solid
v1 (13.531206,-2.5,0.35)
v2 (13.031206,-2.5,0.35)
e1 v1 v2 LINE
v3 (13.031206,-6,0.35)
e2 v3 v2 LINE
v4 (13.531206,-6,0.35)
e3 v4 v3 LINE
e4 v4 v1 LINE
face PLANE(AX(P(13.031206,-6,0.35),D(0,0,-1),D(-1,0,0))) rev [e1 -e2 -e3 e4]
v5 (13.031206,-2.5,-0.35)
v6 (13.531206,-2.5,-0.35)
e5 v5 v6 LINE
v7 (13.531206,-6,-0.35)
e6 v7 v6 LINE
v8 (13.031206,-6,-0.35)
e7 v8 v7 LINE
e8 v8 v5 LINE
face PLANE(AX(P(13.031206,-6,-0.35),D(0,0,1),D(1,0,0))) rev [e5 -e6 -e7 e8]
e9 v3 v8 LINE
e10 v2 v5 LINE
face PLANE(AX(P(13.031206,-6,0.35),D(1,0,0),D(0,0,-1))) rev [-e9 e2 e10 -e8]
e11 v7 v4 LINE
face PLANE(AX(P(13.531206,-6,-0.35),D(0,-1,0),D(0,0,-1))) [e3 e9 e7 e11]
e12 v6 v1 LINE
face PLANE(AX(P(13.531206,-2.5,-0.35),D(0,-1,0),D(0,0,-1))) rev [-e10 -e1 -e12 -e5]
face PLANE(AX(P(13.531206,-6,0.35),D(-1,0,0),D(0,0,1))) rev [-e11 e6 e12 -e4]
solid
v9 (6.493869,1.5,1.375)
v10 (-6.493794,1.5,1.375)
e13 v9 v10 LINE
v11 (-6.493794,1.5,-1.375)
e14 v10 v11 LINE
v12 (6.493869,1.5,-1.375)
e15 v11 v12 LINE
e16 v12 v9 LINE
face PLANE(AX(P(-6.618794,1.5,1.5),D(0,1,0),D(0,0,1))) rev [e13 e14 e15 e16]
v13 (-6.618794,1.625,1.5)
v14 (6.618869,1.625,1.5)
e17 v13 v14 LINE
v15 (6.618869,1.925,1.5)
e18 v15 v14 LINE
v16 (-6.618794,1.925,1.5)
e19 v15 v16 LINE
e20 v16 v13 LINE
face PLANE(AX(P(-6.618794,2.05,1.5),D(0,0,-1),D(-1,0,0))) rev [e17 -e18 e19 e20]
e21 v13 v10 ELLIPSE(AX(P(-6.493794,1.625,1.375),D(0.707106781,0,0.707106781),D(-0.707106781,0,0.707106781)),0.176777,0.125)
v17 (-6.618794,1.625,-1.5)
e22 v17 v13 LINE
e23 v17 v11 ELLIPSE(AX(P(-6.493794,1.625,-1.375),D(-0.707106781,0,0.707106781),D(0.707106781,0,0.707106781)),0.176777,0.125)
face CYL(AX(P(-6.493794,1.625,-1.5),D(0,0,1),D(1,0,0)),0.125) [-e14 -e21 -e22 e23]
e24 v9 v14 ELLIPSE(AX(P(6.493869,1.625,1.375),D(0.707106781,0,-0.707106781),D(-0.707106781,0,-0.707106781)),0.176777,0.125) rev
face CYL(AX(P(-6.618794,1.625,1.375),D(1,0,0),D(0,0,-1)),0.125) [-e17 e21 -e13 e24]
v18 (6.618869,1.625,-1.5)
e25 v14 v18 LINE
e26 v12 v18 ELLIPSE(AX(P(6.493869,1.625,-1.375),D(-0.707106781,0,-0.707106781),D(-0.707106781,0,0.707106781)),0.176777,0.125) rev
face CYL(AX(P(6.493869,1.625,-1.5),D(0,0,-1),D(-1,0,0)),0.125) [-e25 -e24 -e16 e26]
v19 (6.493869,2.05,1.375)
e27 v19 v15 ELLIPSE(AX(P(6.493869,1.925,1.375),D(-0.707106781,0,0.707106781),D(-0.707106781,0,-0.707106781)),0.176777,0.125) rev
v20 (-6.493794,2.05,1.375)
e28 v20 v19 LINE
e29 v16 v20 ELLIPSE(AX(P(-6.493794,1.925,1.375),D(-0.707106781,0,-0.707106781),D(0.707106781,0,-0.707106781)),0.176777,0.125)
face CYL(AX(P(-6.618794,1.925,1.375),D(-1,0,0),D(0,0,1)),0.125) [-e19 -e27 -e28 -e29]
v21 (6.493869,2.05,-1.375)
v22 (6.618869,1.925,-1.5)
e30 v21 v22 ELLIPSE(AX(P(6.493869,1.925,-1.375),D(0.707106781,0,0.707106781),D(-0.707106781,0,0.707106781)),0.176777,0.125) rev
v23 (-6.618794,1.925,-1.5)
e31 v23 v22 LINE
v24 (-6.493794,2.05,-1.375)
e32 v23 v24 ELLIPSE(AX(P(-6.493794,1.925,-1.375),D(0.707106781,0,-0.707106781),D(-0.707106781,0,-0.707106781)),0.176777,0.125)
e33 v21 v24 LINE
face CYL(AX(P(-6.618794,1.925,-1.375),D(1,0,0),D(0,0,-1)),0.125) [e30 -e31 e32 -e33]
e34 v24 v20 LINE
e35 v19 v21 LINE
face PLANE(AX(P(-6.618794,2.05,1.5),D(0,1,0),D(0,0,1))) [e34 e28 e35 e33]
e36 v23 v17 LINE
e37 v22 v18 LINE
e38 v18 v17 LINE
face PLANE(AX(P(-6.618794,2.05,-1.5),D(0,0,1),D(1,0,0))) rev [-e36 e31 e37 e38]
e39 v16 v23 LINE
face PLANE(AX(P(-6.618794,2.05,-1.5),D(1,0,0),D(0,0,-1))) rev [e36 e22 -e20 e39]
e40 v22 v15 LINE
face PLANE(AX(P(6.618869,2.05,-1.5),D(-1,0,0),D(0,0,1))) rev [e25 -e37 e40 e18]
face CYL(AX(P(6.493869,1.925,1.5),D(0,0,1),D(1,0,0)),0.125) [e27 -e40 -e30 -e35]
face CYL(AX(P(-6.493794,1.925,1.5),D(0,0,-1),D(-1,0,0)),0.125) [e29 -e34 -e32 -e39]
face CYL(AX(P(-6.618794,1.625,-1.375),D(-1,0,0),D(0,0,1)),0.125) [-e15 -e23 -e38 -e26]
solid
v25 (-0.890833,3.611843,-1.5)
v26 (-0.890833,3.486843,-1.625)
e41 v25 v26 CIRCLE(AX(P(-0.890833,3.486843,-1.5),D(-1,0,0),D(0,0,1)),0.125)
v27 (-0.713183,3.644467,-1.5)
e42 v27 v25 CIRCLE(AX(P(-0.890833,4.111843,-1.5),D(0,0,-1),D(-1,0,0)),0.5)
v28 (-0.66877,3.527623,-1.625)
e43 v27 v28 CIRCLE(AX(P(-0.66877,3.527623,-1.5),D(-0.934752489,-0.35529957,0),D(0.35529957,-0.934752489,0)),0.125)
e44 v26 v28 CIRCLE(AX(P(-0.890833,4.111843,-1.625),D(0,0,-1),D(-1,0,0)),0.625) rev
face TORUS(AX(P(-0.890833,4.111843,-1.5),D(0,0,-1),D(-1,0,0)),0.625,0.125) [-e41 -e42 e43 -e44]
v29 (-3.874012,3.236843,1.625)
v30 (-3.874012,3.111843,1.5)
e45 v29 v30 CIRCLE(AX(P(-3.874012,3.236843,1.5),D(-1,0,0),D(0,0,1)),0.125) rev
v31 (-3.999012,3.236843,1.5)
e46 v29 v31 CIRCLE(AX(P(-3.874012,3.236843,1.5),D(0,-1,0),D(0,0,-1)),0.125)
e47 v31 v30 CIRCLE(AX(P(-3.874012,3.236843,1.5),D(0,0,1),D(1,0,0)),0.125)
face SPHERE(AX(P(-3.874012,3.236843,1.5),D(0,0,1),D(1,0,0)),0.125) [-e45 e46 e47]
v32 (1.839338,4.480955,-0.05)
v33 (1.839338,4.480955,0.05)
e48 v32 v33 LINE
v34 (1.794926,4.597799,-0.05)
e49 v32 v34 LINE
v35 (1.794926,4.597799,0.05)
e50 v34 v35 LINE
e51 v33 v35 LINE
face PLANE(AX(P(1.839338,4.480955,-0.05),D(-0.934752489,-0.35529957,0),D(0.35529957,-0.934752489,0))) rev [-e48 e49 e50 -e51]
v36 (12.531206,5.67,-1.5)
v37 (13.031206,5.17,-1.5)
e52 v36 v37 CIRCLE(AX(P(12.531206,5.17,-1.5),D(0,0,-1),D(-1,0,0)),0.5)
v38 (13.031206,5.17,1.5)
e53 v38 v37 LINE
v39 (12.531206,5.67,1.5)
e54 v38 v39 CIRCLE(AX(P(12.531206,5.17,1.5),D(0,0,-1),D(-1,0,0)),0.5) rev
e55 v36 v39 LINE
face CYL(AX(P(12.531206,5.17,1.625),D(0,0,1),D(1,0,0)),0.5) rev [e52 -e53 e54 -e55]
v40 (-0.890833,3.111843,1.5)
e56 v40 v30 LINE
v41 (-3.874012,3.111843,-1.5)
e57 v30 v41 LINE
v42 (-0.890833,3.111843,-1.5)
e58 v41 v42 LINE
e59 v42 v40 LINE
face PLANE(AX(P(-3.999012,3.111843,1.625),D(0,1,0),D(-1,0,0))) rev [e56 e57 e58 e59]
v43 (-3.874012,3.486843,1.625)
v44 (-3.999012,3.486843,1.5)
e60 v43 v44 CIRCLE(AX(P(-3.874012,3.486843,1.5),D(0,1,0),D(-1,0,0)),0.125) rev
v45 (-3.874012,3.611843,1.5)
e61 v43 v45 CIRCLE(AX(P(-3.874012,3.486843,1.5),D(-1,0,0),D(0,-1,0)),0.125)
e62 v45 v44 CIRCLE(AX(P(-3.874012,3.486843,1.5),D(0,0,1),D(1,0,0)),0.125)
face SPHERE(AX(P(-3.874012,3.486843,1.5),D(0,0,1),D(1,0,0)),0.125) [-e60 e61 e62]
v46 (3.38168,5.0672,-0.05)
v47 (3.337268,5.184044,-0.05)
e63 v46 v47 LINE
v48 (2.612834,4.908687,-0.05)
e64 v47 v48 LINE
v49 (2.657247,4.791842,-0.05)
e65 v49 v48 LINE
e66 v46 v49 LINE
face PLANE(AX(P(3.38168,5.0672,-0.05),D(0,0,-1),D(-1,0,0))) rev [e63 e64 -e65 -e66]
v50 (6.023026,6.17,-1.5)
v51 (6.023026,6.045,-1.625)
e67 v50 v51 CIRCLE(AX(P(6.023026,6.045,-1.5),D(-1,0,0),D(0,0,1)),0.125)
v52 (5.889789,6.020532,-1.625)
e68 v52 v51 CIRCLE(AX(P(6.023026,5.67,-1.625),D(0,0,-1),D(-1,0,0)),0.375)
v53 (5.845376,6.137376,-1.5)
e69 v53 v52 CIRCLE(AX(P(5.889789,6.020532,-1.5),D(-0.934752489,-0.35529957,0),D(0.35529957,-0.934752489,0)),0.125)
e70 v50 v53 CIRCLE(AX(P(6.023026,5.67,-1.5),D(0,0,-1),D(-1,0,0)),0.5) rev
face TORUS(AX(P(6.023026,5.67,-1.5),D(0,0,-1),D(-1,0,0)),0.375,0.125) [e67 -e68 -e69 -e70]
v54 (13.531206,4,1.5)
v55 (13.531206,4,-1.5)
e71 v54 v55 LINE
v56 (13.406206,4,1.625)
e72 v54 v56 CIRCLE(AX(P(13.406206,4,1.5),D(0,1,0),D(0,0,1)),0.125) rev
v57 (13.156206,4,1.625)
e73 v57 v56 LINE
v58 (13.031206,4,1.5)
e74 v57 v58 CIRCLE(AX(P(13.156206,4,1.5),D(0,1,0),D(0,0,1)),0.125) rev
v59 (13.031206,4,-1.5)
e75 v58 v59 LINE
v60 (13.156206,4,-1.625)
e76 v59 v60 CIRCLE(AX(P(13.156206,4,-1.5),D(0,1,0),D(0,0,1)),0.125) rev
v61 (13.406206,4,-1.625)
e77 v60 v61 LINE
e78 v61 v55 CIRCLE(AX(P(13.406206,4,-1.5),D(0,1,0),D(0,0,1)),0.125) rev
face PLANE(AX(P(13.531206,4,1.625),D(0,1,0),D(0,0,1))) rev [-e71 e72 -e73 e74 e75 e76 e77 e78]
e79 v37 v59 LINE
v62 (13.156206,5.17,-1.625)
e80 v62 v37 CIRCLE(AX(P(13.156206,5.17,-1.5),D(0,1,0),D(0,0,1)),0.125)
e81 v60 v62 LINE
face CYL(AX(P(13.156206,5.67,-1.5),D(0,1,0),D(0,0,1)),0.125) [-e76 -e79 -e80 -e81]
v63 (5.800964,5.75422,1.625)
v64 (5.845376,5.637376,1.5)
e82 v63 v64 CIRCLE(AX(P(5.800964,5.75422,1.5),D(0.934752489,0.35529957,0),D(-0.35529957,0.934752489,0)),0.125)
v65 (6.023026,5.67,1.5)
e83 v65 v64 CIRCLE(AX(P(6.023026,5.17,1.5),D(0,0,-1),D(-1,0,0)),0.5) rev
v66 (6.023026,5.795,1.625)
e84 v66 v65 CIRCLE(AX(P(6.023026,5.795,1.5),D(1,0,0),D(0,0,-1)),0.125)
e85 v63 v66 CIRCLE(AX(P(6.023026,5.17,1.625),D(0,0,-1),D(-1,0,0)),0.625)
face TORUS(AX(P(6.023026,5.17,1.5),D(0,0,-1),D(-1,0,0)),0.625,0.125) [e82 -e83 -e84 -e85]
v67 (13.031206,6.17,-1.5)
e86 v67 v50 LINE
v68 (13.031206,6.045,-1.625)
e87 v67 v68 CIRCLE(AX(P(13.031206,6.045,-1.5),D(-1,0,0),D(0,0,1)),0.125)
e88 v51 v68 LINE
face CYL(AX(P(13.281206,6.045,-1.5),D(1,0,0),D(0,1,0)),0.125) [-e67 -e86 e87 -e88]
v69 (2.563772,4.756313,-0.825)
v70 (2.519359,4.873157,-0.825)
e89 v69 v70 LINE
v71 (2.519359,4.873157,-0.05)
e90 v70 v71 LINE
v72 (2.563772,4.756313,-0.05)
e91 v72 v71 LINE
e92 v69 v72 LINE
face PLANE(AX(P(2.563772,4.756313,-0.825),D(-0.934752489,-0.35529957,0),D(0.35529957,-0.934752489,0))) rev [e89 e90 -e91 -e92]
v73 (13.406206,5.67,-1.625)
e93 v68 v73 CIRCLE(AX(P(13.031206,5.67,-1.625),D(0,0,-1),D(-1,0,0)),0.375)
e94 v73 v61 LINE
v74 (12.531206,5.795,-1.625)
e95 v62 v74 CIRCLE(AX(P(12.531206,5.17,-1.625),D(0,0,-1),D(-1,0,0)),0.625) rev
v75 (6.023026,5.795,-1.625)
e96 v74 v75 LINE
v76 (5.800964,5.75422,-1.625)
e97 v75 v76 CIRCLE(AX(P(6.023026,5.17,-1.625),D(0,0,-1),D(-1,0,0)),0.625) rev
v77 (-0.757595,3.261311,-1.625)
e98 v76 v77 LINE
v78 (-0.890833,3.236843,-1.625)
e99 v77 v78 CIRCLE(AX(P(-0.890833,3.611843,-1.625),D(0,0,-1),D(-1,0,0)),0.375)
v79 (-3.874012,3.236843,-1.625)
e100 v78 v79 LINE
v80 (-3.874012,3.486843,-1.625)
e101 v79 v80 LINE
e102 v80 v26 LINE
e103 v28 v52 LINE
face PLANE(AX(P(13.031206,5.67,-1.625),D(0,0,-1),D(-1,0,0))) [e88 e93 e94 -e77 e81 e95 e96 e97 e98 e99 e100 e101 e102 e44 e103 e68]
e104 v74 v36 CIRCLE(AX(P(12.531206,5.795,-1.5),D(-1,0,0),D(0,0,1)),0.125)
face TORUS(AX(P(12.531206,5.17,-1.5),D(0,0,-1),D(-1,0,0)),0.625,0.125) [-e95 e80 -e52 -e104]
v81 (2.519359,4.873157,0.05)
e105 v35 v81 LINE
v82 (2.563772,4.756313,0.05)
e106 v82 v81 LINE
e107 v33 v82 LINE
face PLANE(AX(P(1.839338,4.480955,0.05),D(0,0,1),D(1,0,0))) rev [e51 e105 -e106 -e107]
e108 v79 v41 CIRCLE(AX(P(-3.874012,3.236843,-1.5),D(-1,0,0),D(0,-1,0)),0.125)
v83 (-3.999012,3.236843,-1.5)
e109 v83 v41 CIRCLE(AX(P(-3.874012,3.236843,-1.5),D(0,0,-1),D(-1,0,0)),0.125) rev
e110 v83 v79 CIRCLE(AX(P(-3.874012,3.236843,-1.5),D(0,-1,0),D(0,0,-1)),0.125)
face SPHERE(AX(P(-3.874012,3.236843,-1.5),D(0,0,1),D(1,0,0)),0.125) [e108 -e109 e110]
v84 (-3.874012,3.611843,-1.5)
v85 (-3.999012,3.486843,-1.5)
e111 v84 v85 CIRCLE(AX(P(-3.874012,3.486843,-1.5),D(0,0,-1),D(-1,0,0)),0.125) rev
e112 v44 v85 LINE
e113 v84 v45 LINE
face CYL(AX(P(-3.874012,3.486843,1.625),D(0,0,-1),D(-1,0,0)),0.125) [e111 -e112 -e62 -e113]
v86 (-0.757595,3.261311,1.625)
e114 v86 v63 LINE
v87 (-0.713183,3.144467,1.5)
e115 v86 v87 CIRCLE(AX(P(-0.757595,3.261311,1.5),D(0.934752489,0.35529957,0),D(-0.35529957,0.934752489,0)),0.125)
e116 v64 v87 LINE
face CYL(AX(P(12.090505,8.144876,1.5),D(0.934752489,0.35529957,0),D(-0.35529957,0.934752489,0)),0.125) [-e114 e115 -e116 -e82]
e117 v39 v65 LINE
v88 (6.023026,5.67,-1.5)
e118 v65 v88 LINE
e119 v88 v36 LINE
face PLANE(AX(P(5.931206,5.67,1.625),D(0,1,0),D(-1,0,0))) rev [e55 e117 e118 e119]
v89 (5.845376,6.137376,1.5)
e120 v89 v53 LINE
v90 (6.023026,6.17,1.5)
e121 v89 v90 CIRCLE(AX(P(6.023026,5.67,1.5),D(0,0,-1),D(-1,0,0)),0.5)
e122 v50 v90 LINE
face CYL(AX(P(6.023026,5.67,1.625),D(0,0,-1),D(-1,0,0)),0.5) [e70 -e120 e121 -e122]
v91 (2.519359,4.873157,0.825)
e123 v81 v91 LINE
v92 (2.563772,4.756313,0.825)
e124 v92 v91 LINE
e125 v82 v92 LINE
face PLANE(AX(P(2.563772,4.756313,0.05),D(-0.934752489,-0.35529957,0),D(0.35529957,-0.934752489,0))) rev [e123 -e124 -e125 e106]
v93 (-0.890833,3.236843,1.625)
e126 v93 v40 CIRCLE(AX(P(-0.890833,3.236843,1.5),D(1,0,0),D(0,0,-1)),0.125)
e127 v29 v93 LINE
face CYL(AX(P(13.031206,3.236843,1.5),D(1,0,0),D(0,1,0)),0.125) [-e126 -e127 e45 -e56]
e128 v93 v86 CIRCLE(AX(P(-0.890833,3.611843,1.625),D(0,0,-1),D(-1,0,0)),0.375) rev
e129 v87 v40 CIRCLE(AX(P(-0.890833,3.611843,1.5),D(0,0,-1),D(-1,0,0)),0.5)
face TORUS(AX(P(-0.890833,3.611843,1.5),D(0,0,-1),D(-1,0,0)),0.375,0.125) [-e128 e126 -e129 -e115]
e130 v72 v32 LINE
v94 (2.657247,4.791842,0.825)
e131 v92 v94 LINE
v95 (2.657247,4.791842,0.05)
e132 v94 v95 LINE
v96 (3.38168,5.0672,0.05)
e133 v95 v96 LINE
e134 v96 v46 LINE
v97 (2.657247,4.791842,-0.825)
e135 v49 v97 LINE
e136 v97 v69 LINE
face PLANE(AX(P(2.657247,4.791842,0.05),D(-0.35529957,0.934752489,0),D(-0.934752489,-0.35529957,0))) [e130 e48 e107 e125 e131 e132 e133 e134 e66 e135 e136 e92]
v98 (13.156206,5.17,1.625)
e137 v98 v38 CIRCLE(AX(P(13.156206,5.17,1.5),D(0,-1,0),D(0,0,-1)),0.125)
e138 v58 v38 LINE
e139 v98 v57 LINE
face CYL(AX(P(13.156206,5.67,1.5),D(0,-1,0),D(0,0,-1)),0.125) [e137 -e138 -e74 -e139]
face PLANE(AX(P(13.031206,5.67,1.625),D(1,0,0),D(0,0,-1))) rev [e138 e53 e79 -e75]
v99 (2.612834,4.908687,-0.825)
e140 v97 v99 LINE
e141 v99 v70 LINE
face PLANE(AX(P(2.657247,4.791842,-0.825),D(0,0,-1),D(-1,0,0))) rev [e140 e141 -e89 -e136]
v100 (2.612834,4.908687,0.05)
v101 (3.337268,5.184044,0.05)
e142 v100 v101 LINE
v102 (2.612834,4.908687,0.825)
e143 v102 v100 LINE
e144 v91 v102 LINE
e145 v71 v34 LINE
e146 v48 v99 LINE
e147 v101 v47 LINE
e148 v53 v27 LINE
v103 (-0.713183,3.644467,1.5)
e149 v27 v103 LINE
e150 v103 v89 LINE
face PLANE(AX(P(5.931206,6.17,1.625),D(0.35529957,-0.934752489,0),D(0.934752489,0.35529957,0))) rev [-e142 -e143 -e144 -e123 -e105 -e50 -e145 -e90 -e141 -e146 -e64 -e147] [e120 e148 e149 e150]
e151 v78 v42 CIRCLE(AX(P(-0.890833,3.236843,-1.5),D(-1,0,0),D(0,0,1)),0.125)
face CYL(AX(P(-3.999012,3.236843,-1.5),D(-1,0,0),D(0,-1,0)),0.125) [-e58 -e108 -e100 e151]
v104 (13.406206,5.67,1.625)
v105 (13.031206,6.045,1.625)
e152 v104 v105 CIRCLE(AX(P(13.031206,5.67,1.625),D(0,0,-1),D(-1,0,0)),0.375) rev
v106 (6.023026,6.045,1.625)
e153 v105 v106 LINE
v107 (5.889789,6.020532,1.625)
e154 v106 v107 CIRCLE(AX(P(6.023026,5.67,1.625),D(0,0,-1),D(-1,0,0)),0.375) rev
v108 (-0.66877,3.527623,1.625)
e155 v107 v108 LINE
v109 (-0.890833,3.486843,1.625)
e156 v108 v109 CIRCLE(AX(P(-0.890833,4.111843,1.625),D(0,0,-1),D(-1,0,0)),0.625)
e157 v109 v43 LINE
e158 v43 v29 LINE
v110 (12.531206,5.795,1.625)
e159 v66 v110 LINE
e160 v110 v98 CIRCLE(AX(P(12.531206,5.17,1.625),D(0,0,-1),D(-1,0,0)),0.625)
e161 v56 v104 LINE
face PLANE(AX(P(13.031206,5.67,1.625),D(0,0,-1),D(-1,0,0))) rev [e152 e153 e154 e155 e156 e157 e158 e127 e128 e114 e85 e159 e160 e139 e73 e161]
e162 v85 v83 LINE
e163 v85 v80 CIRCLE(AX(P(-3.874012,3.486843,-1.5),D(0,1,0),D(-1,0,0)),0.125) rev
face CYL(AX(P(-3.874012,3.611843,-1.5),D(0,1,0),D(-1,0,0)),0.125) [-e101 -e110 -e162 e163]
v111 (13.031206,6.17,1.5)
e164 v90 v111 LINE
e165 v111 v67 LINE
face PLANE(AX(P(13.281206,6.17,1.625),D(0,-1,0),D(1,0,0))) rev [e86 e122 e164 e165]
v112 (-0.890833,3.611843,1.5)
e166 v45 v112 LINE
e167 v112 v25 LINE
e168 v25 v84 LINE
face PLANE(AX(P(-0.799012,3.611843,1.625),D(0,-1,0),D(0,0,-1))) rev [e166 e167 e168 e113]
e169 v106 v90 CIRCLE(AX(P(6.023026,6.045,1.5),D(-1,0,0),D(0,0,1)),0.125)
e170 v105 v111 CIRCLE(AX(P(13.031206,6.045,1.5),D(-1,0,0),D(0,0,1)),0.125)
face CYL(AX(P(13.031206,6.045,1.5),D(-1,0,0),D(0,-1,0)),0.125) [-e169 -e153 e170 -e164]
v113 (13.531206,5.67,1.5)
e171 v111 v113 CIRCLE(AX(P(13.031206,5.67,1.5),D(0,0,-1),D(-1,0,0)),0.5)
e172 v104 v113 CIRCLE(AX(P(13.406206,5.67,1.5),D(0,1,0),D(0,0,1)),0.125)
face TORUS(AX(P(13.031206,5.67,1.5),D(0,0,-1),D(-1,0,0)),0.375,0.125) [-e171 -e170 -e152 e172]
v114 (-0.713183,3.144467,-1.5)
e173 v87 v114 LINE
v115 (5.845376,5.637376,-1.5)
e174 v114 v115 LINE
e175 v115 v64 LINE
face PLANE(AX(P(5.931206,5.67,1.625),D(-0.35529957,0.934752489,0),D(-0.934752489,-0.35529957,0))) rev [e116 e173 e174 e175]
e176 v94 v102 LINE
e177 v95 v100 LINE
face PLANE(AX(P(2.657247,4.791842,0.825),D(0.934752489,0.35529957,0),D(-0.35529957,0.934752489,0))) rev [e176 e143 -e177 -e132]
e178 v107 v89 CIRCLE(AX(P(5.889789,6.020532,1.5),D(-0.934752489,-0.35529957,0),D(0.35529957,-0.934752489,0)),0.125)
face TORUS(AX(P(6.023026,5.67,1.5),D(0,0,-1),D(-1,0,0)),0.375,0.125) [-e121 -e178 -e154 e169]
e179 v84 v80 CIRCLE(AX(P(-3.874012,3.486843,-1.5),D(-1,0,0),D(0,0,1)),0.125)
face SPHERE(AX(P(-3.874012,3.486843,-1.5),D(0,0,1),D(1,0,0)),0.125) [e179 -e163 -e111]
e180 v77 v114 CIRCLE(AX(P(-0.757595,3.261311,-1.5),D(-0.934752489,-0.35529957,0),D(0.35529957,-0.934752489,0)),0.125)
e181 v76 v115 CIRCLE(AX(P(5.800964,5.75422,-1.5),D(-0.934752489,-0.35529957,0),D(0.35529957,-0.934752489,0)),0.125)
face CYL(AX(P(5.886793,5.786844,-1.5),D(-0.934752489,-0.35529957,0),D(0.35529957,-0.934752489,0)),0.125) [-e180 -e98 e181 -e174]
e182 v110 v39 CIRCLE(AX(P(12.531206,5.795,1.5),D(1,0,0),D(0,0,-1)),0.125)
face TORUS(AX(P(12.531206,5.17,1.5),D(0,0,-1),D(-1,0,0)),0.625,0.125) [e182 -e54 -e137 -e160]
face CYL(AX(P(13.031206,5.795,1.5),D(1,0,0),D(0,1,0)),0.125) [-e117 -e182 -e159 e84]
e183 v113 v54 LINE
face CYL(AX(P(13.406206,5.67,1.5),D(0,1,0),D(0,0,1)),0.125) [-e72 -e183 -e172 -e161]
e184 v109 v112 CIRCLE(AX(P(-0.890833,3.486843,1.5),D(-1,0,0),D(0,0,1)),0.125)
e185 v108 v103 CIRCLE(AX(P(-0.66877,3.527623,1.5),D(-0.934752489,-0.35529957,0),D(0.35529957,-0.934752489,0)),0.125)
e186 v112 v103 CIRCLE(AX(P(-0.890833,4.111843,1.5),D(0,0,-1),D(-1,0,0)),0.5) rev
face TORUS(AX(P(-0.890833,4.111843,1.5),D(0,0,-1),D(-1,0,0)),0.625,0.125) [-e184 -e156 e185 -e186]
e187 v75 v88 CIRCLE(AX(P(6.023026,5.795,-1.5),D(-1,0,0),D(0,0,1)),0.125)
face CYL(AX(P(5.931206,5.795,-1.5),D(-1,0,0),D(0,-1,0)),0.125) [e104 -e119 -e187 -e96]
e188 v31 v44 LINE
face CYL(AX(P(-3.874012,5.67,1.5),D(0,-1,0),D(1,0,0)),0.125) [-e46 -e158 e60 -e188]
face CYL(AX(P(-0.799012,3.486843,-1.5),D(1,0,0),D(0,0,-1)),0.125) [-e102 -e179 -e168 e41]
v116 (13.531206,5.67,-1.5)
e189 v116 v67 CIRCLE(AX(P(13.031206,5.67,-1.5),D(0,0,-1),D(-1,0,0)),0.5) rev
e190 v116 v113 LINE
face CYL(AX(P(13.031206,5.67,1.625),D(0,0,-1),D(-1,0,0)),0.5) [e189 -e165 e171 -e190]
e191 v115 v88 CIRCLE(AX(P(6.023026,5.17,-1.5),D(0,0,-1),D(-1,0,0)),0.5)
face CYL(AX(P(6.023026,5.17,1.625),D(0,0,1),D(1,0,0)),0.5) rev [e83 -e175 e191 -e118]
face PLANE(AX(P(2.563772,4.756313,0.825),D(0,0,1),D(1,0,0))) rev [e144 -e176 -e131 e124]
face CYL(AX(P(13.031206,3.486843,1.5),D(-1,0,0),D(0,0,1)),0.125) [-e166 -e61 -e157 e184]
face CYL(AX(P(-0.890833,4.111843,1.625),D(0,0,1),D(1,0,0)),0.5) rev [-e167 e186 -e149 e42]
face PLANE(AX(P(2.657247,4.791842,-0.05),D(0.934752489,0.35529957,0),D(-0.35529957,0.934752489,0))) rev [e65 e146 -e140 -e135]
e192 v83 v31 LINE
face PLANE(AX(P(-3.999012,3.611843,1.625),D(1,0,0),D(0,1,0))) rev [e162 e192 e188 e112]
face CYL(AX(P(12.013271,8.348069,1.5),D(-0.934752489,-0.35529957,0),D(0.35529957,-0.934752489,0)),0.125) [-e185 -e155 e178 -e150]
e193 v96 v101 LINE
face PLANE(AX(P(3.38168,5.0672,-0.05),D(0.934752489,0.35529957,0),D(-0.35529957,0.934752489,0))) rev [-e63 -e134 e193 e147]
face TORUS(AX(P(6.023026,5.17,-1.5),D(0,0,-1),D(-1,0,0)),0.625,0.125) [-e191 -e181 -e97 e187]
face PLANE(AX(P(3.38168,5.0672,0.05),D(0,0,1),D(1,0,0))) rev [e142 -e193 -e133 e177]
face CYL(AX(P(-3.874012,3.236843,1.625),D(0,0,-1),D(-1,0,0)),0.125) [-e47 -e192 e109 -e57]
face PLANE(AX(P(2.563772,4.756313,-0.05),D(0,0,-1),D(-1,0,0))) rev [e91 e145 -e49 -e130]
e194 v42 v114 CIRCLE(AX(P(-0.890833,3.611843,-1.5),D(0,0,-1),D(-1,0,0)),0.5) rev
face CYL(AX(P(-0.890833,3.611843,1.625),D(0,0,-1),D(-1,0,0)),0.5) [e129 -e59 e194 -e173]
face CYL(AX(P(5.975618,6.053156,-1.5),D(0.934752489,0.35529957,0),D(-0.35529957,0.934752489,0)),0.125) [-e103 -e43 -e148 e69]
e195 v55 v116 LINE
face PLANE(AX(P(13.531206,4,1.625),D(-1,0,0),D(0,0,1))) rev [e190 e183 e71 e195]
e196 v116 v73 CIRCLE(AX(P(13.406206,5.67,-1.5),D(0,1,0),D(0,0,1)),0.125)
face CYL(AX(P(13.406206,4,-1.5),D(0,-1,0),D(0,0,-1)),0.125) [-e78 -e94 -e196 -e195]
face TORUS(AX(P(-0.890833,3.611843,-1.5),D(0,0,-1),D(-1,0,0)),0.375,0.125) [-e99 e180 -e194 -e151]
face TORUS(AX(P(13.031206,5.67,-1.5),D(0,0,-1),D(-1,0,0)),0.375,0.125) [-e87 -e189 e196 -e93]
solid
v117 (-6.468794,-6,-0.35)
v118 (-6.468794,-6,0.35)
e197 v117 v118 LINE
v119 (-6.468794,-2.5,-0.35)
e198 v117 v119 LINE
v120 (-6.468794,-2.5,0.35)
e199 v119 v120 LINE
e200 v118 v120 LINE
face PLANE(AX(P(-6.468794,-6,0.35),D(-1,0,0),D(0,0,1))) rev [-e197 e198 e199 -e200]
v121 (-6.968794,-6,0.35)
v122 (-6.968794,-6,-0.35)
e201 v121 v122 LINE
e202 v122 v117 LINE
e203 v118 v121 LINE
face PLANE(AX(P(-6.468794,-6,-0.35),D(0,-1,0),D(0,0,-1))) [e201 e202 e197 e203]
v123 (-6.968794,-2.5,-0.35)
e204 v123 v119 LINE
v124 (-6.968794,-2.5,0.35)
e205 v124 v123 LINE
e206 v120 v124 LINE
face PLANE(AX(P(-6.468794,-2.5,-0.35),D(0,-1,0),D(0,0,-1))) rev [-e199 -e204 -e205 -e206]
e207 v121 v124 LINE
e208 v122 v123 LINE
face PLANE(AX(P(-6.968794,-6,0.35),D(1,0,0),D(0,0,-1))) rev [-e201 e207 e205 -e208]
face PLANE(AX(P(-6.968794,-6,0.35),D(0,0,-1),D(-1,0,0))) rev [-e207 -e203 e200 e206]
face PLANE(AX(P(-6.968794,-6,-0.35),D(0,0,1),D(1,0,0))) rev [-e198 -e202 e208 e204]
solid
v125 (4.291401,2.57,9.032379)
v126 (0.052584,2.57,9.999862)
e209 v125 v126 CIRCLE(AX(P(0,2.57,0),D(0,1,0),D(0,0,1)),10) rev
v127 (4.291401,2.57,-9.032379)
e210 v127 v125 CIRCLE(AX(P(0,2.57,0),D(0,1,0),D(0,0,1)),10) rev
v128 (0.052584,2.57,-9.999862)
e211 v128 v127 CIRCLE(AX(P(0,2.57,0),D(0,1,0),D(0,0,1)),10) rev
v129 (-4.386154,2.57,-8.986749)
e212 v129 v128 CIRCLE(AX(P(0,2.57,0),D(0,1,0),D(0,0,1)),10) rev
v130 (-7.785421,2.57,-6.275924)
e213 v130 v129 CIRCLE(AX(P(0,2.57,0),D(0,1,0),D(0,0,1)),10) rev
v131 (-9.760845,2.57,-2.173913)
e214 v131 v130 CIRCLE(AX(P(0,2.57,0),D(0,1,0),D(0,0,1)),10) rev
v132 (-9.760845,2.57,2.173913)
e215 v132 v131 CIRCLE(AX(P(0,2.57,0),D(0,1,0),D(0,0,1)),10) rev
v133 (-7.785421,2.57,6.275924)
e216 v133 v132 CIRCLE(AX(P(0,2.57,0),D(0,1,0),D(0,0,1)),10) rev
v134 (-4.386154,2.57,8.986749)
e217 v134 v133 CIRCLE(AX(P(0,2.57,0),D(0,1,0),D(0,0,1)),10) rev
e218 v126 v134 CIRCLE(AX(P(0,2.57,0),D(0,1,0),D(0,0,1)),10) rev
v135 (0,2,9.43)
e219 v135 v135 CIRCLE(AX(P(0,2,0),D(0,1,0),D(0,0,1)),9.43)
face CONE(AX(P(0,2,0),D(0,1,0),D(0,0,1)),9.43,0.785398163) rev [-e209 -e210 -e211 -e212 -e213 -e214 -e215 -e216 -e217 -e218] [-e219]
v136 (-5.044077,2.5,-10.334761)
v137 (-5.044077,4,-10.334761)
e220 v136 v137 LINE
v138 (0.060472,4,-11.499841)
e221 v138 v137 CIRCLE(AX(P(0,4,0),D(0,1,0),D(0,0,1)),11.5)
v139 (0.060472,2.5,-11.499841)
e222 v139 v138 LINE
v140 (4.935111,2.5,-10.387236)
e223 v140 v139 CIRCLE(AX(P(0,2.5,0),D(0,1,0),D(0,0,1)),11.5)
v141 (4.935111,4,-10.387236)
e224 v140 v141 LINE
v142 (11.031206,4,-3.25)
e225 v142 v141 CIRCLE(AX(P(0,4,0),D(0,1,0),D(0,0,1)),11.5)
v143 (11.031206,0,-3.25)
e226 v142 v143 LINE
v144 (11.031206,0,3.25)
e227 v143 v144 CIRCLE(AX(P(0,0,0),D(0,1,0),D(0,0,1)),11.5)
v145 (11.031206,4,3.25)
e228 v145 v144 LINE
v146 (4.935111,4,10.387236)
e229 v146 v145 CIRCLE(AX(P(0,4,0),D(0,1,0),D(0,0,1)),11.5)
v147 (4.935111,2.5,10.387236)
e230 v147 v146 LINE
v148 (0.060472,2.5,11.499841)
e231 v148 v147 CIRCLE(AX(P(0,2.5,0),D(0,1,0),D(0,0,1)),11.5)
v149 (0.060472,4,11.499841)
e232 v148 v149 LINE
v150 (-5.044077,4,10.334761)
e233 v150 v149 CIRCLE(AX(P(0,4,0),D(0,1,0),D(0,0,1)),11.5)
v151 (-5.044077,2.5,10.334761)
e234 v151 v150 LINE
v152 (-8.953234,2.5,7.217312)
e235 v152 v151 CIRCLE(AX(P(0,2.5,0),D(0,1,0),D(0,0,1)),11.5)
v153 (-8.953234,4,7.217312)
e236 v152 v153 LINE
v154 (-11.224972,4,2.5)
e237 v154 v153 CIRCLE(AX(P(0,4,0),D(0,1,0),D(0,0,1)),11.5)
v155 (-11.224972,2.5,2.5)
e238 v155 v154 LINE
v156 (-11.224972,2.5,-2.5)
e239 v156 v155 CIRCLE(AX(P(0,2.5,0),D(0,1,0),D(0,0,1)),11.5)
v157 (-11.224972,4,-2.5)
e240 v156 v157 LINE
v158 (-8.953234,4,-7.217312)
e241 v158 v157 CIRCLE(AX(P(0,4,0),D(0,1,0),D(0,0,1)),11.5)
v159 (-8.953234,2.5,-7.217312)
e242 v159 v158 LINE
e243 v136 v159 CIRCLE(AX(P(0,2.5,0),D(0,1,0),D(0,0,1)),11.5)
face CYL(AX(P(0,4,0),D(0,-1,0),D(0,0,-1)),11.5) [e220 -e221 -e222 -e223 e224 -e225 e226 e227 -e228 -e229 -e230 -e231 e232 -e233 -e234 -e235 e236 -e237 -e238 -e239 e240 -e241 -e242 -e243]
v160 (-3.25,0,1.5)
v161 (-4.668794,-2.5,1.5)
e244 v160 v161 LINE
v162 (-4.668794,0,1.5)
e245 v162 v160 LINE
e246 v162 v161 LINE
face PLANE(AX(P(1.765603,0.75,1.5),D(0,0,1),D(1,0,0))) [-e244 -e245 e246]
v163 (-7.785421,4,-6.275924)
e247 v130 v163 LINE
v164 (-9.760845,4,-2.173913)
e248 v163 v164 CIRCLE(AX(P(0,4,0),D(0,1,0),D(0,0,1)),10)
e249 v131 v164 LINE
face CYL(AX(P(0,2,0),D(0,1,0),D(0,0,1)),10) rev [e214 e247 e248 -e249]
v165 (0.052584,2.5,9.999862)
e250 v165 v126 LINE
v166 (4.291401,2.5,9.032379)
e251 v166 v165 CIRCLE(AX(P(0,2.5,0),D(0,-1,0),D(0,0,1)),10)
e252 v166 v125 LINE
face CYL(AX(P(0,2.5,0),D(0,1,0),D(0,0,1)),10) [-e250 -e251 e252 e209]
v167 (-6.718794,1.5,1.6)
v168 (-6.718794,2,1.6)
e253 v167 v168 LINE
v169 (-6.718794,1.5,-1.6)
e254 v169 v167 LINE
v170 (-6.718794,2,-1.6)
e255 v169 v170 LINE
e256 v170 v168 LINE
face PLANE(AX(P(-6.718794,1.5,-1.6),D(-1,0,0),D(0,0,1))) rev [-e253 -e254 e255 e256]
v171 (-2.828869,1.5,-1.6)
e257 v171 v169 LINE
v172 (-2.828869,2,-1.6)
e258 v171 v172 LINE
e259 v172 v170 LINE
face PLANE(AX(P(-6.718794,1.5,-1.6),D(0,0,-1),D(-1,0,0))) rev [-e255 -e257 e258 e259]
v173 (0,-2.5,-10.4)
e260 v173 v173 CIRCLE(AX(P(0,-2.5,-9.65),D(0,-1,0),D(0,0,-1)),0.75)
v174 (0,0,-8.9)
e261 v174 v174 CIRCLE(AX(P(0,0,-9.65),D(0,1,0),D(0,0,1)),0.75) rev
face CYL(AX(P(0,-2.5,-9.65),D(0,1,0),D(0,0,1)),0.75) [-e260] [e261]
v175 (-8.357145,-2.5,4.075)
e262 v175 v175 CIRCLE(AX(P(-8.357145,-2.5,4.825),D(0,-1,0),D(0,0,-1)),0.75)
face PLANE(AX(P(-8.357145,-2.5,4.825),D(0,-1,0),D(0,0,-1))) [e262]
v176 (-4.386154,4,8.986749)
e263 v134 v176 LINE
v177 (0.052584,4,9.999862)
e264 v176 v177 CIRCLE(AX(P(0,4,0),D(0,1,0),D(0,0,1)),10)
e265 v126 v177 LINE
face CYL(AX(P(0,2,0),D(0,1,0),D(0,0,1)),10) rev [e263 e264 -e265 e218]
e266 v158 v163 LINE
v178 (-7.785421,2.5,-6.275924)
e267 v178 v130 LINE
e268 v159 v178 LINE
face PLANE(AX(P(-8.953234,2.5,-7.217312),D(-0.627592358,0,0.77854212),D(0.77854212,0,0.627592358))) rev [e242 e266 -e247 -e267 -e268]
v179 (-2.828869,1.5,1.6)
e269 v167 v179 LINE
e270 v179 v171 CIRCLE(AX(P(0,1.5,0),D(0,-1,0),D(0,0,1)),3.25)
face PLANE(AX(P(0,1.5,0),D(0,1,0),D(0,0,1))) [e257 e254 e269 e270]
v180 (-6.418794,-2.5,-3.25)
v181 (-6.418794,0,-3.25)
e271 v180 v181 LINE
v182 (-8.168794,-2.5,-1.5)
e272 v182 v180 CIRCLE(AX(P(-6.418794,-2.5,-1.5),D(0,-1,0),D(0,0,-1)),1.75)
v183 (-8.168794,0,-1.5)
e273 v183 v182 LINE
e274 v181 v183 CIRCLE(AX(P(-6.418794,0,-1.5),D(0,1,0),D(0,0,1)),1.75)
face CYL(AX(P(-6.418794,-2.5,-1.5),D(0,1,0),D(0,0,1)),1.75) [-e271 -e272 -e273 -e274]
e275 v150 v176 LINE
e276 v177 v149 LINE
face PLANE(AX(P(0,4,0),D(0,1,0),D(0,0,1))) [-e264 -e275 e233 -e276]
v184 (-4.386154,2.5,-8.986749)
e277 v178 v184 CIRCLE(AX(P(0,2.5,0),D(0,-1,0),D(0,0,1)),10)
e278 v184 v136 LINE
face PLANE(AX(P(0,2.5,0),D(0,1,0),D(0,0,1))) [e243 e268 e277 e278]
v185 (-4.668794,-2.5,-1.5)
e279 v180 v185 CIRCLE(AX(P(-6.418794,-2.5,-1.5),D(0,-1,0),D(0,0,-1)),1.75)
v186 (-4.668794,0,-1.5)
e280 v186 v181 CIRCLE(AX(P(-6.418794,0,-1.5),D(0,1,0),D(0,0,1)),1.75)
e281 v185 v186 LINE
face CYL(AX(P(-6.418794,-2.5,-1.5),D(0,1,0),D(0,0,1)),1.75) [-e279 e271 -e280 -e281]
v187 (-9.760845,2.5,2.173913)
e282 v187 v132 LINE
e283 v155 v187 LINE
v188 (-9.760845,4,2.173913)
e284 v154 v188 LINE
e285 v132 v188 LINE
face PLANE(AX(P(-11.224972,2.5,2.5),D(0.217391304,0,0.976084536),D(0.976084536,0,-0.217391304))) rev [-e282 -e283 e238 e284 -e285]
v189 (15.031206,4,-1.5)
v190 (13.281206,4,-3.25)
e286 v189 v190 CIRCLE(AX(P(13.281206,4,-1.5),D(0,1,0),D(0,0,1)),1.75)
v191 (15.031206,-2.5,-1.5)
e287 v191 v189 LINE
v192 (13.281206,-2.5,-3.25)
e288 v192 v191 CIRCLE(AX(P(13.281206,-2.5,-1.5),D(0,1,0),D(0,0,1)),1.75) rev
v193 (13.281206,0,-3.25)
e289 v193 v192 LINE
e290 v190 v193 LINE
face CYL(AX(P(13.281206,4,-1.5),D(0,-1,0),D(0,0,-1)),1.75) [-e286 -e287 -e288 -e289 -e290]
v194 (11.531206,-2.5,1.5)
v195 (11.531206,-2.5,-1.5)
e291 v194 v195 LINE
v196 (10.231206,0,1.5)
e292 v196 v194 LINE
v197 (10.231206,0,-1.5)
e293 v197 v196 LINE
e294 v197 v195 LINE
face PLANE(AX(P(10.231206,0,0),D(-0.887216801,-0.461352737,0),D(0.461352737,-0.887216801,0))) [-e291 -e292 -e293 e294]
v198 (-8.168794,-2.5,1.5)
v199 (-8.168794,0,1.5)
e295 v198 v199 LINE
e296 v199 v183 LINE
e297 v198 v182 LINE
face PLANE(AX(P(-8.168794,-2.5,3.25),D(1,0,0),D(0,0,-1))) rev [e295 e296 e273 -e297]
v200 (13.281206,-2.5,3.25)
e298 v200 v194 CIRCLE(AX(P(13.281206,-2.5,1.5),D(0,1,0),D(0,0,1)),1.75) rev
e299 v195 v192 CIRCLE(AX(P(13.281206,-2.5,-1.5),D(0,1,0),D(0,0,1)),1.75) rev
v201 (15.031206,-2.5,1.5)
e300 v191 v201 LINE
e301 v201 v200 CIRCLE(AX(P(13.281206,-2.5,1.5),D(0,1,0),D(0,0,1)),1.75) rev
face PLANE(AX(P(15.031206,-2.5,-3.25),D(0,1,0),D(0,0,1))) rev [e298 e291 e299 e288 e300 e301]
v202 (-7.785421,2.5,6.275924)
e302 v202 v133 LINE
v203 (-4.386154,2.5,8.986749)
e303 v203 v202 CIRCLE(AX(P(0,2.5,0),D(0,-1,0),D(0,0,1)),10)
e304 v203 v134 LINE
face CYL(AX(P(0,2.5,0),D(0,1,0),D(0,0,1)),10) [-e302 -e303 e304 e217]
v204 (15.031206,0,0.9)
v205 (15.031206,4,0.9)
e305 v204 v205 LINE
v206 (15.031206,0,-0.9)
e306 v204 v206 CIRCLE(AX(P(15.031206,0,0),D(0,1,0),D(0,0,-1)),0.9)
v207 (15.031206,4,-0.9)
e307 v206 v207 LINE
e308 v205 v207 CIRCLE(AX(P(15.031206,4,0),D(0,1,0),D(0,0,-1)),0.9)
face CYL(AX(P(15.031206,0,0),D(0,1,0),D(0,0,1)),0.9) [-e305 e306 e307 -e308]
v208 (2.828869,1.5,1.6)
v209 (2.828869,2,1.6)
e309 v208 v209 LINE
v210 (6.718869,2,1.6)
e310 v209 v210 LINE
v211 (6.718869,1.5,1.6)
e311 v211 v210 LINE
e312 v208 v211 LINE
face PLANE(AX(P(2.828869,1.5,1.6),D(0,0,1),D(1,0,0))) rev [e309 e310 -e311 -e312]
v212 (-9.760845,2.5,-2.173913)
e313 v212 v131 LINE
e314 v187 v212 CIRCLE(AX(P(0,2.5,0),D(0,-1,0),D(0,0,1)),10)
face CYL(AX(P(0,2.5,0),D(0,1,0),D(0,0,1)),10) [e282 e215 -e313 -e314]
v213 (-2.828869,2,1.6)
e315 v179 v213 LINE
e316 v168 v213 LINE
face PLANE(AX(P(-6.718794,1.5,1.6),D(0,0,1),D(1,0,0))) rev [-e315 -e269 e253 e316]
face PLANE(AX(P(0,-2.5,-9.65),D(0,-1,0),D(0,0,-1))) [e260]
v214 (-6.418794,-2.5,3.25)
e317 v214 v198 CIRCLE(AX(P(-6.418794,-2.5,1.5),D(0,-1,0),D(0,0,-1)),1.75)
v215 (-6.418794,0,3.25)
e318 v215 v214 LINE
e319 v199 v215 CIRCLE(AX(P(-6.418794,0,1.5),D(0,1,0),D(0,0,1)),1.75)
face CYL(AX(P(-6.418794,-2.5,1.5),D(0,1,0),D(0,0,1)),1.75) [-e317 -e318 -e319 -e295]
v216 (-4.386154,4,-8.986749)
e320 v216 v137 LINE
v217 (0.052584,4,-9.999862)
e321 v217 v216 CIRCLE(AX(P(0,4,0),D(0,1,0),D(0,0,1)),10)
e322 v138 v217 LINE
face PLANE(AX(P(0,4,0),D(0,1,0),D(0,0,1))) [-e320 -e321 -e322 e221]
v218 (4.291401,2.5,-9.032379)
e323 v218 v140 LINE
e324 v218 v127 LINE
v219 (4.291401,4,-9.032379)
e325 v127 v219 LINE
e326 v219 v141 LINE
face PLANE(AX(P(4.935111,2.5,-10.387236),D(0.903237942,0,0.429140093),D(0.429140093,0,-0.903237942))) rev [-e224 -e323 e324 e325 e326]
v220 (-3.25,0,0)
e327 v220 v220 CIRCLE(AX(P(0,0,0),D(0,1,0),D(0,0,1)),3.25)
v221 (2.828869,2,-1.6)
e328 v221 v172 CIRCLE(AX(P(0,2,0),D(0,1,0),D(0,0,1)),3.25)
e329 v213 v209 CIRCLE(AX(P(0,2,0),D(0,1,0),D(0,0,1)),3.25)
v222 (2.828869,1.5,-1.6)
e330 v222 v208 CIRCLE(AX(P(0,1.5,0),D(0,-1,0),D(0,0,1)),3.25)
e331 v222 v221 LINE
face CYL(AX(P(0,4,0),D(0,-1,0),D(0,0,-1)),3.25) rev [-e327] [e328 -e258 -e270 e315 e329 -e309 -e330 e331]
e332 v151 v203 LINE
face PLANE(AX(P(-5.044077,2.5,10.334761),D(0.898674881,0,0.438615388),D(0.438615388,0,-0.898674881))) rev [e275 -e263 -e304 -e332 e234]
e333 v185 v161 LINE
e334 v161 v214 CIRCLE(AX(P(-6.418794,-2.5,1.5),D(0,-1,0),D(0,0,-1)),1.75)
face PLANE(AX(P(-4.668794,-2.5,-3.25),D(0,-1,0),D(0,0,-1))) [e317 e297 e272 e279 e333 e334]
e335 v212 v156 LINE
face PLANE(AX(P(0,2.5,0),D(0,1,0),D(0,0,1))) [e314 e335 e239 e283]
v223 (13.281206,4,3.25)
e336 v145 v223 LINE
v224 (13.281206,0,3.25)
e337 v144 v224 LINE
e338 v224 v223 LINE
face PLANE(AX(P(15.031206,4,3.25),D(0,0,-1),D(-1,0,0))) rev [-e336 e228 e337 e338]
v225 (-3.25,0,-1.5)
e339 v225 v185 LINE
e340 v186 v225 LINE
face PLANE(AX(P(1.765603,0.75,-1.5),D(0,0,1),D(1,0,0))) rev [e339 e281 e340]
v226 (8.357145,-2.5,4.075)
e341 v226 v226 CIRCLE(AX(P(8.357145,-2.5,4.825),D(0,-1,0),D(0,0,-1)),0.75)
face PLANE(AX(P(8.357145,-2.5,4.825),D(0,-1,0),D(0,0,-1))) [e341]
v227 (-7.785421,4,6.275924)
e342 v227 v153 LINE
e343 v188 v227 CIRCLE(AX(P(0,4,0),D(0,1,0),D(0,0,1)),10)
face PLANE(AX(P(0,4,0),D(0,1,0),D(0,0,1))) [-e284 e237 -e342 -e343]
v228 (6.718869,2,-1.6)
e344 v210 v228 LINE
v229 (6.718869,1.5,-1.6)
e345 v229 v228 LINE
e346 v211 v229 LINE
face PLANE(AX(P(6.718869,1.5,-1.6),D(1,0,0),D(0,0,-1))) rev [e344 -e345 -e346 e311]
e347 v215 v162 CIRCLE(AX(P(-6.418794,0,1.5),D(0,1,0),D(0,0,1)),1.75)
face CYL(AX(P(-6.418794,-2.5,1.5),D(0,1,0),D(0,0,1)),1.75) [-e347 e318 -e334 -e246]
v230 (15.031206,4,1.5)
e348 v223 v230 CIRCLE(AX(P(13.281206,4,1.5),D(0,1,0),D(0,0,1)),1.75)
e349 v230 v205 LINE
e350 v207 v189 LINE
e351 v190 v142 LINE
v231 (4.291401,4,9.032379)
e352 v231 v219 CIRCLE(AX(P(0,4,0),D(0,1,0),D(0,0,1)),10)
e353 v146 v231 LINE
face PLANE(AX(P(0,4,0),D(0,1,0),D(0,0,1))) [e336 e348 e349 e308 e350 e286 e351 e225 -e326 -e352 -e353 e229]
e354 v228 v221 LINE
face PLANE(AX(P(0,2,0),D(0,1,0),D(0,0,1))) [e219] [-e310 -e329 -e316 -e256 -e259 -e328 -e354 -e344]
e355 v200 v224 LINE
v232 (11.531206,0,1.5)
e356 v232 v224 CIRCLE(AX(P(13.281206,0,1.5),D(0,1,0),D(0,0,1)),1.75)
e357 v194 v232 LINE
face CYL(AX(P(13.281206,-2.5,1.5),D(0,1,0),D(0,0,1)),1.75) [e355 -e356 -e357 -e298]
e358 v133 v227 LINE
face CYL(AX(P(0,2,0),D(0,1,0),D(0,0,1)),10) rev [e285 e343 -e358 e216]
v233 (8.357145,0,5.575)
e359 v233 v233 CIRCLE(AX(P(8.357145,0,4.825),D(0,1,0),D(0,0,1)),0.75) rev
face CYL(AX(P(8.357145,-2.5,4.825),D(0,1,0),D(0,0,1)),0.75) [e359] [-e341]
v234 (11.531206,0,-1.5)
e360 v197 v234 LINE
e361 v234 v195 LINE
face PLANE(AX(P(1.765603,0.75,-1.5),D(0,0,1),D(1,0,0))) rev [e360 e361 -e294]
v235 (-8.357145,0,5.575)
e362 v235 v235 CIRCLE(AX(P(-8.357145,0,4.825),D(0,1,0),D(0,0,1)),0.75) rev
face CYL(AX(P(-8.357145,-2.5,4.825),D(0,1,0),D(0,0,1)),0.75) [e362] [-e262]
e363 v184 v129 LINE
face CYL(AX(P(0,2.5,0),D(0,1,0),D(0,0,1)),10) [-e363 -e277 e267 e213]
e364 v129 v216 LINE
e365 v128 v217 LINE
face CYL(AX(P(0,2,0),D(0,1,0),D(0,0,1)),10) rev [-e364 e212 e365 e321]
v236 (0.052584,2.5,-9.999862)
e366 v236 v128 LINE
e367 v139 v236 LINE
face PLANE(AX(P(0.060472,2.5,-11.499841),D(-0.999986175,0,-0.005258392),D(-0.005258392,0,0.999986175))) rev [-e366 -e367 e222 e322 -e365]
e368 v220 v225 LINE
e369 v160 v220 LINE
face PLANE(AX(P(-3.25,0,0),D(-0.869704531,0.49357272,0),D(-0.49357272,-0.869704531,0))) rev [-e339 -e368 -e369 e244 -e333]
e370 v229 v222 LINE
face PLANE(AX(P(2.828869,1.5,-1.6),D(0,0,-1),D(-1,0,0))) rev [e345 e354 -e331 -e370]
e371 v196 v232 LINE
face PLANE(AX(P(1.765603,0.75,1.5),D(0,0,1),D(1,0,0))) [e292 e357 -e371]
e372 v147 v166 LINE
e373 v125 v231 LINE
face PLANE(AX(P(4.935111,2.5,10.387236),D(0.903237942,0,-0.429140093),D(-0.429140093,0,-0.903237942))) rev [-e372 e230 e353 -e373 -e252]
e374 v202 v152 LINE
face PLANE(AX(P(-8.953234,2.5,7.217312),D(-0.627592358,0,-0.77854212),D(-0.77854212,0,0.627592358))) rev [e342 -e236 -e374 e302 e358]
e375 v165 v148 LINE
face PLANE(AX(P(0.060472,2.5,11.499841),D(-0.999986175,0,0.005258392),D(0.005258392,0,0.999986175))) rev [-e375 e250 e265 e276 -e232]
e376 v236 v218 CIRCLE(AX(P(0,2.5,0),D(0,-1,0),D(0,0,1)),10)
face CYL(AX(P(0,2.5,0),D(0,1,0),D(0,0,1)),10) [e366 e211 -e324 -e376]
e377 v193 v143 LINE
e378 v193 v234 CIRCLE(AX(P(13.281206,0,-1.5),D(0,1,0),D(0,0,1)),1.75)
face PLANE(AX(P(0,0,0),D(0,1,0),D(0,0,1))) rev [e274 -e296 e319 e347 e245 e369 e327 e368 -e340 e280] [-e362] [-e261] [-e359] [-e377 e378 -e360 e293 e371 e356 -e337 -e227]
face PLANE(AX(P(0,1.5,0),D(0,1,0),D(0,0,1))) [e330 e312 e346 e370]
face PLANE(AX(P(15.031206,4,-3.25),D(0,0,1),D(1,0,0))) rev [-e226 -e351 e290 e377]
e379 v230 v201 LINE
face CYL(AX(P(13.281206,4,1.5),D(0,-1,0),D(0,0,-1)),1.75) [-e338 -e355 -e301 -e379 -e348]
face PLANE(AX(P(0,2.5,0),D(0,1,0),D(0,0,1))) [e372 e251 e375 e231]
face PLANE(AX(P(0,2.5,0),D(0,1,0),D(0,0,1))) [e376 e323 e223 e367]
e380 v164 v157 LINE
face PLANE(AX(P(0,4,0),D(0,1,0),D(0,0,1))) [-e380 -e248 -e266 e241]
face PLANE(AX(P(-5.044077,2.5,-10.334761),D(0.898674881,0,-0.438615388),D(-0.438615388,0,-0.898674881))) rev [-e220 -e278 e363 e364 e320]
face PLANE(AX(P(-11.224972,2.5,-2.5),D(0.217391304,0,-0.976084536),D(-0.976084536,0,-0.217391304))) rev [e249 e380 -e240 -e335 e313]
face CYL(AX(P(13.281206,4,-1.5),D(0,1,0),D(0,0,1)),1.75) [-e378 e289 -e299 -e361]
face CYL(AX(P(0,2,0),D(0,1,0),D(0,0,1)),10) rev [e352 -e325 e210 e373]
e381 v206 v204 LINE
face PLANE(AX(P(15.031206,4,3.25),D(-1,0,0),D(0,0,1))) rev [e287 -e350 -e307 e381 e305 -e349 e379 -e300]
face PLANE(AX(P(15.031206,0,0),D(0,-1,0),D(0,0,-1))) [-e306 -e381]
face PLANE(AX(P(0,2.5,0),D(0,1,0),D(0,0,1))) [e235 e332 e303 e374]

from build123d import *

# Parameters (mm, degrees)
SKETCH3_R             = 3.25
BOSS_EXTRUDE2_DEPTH   = 4
SKETCH7_R             = 10
CUT_EXTRUDE1_DEPTH    = 2
CHAMFER3_SIZE         = 0.57
CUT_EXTRUDE2_DEPTH    = 1.5
SKETCH9_R             = 0.75
SKETCH9_W             = 3.5
SKETCH9_H             = 6.5
BOSS_EXTRUDE6_DEPTH   = 2.5
FILLET1_R             = 1.75
RIB1_REACH            = 21.344
SKETCH10_WALL_W       = 43.505635646
SKETCH10_WALL_H       = 3
RIB2_REACH            = 21.344
SKETCH12_WALL_W       = 43.562374554
SKETCH12_WALL_H       = 3
SKETCH13_W            = 0.5
SKETCH13_H            = 0.7
BOSS_EXTRUDE7_DEPTH   = 3.5
BOSS_EXTRUDE7_2_DEPTH = 3.5
CUT_EXTRUDE3_START    = -0.5
CUT_EXTRUDE3_DEPTH    = 0.5
SKETCH15_W            = 13.237663296
SKETCH15_H            = 3
BOSS_EXTRUDE8_DEPTH   = 0.55
BOSS_EXTRUDE9_DEPTH   = 1.625
FILLET2_R             = 0.5
FILLET3_R             = 0.125
FILLET4_R             = 0.125
CUT_EXTRUDE4_DEPTH    = 0.125
BOSS_EXTRUDE10_DEPTH  = 4


with BuildPart() as part:
    # Sketch3 → Boss-Extrude2 (new body)
    with BuildSketch(Plane(origin=(0, 0, 0), x_dir=(1, 0, 0), z_dir=(0, 1, 0))):
        with BuildLine():
            Line((15.031205736, -3.25), (11.031205736, -3.25))
            ThreePointArc((11.031205736, -3.25), (-11.5, 0), (11.031205736, 3.25))
            Line((11.031205736, 3.25), (15.031205736, 3.25))
            Line((15.031205736, 3.25), (15.031205736, -3.25))
        make_face()
        with Locations(Location((0, 0, 0), (0, 0, 270))):
            Circle(SKETCH3_R, mode=Mode.SUBTRACT)
    extrude(amount=BOSS_EXTRUDE2_DEPTH)

    # Sketch7 → Cut-Extrude1 (cut)
    with BuildSketch(Plane(origin=(0, 4, 0), x_dir=(1, 0, 0), z_dir=(0, 1, 0))):
        with Locations(Location((0, 0, 0), (0, 0, 270))):
            Circle(SKETCH7_R)
    extrude(amount=-CUT_EXTRUDE1_DEPTH, mode=Mode.SUBTRACT)

    # Chamfer3
    chamfer3_edges = [part.edges().sort_by_distance(p)[0] for p in [
        (0, 2, -10),
    ]]
    chamfer(chamfer3_edges, length=CHAMFER3_SIZE)

    # Sketch8 → Cut-Extrude2 (cut)
    with BuildSketch(Plane(origin=(0, 4, 0), x_dir=(1, 0, 0), z_dir=(0, 1, 0))):
        with BuildLine():
            Line((-11.22497216, 2.5), (-9.760845357, 2.173913043))
            ThreePointArc((-9.760845357, 2.173913043), (-10, 0), (-9.760845357, -2.173913043))
            Line((-9.760845357, -2.173913043), (-11.22497216, -2.5))
            ThreePointArc((-11.22497216, -2.5), (-11.5, 0), (-11.22497216, 2.5))
        make_face()
        with BuildLine():
            Line((-5.044076962, 10.334761129), (-4.38615388, 8.986748808))
            ThreePointArc((-4.38615388, 8.986748808), (-6.234898019, 7.818314825), (-7.785421195, 6.275923583))
            Line((-7.785421195, 6.275923583), (-8.953234374, 7.21731212))
            ThreePointArc((-8.953234374, 7.21731212), (-7.170132721, 8.991062048), (-5.044076962, 10.334761129))
        make_face()
        with BuildLine():
            Line((4.935111069, 10.387236338), (4.29140093, 9.032379424))
            ThreePointArc((4.29140093, 9.032379424), (2.22520934, 9.749279122), (0.05258392, 9.999861746))
            Line((0.05258392, 9.999861746), (0.060471508, 11.499841007))
            ThreePointArc((0.060471508, 11.499841007), (2.55899074, 11.21167099), (4.935111069, 10.387236338))
        make_face()
        with BuildLine():
            Line((0.060471508, -11.499841007), (0.05258392, -9.999861746))
            ThreePointArc((0.05258392, -9.999861746), (2.22520934, -9.749279122), (4.29140093, -9.032379424))
            Line((4.29140093, -9.032379424), (4.935111069, -10.387236338))
            ThreePointArc((4.935111069, -10.387236338), (2.55899074, -11.21167099), (0.060471508, -11.499841007))
        make_face()
        with BuildLine():
            Line((-8.953234374, -7.21731212), (-7.785421195, -6.275923583))
            ThreePointArc((-7.785421195, -6.275923583), (-6.234898019, -7.818314825), (-4.38615388, -8.986748808))
            Line((-4.38615388, -8.986748808), (-5.044076962, -10.334761129))
            ThreePointArc((-5.044076962, -10.334761129), (-7.170132721, -8.991062048), (-8.953234374, -7.21731212))
        make_face()
    extrude(amount=-CUT_EXTRUDE2_DEPTH, mode=Mode.SUBTRACT)

    # Sketch9 → Boss-Extrude6 (add)
    with BuildSketch(Plane.XZ):
        with Locations(Location((0, -9.65, 0), (0, 0, 90))):
            Circle(SKETCH9_R)
        with Locations(Location((-8.357145147, 4.825, 0), (0, 0, 90))):
            Circle(SKETCH9_R)
        with Locations(Location((8.357145147, 4.825, 0), (0, 0, 90))):
            Circle(SKETCH9_R)
        with Locations((13.281205736, 0)):
            Rectangle(SKETCH9_W, SKETCH9_H)
        with Locations((-6.418794264, 0)):
            Rectangle(SKETCH9_W, SKETCH9_H)
    extrude(amount=BOSS_EXTRUDE6_DEPTH)

    # Fillet1
    fillet1_edges = [part.edges().sort_by_distance(p)[0] for p in [
        (15.031205736, 0.75, -3.25),
        (15.031205736, 0.75, 3.25),
        (-4.668794264, -1.25, -3.25),
        (-8.168794264, -1.25, -3.25),
        (-4.668794264, -1.25, 3.25),
        (-8.168794264, -1.25, 3.25),
        (11.531205736, -1.25, 3.25),
        (11.531205736, -1.25, -3.25),
    ]]
    fillet(fillet1_edges, radius=FILLET1_R - 0.0001)  # a hair under: the kernel refuses the full size

    # Sketch10 wall → Rib1 (add, up to next)
    with BuildSketch(Plane(origin=(10.881205736, -1.25, 0), x_dir=(0.461352736642, -0.887216801235, 0), z_dir=(0.887216801235, 0.461352736642, 0)), mode=Mode.PRIVATE) as rib1_sk1:
        Rectangle(SKETCH10_WALL_W, SKETCH10_WALL_H)
    rib1_tool1 = extrude(rib1_sk1.sketch, amount=RIB1_REACH, mode=Mode.PRIVATE) - part.part
    add(rib1_tool1.solids().sort_by_distance((10.881205736, -1.25, 0))[0])

    # Sketch12 wall → Rib2 (add, up to next)
    with BuildSketch(Plane(origin=(-3.959397132, -1.25, 0), x_dir=(-0.493572719698, -0.869704530498, 0), z_dir=(0.869704530498, -0.493572719698, 0)), mode=Mode.PRIVATE) as rib2_sk1:
        Rectangle(SKETCH12_WALL_W, SKETCH12_WALL_H)
    rib2_tool1 = extrude(rib2_sk1.sketch, amount=-RIB2_REACH, mode=Mode.PRIVATE) - part.part
    add(rib2_tool1.solids().sort_by_distance((-3.959397132, -1.25, 0))[0])

    # Sketch14 → Cut-Extrude3 (cut)
    with BuildSketch(Plane(origin=(0, 2, 0), x_dir=(1, 0, 0), z_dir=(0, 1, 0)).offset(CUT_EXTRUDE3_START)):
        with BuildLine():
            Line((2.828869032, 1.6), (6.718869032, 1.6))
            Line((6.718869032, 1.6), (6.718869032, -1.6))
            Line((6.718869032, -1.6), (2.828869032, -1.6))
            ThreePointArc((2.828869032, -1.6), (3.25, 0), (2.828869032, 1.6))
        make_face()
        with BuildLine():
            Line((-6.718794264, 1.6), (-2.828869032, 1.6))
            ThreePointArc((-2.828869032, 1.6), (-3.25, 0), (-2.828869032, -1.6))
            Line((-2.828869032, -1.6), (-6.718794264, -1.6))
            Line((-6.718794264, -1.6), (-6.718794264, 1.6))
        make_face()
    extrude(amount=CUT_EXTRUDE3_DEPTH, mode=Mode.SUBTRACT)

    # Sketch20 → Boss-Extrude10 (add)
    with BuildSketch(Plane(origin=(0, 4, 0), x_dir=(1, 0, 0), z_dir=(0, 1, 0))):
        with BuildLine():
            Line((15.031205736, 0.9), (15.031205736, -0.9))
            ThreePointArc((15.031205736, -0.9), (15.931205736, 0), (15.031205736, 0.9))
        make_face()
    extrude(amount=-BOSS_EXTRUDE10_DEPTH)


with BuildPart() as body_2:
    # Sketch13 → Boss-Extrude7 (new body)
    with BuildSketch(Plane.XZ.offset(2.5)):
        with Locations((-6.718794264, 0)):
            Rectangle(SKETCH13_W, SKETCH13_H)
    extrude(amount=BOSS_EXTRUDE7_DEPTH)


with BuildPart() as body_3:
    # Sketch13 → Boss-Extrude7 2 (new body)
    with BuildSketch(Plane.XZ.offset(2.5)):
        with Locations((13.281205736, 0)):
            Rectangle(SKETCH13_W, SKETCH13_H)
    extrude(amount=BOSS_EXTRUDE7_2_DEPTH)


with BuildPart() as body_4:
    # Sketch15 → Boss-Extrude8 (new body)
    with BuildSketch(Plane(origin=(0, 1.5, 0), x_dir=(1, 0, 0), z_dir=(0, 1, 0))):
        with Locations((3.7384e-05, 0)):
            Rectangle(SKETCH15_W, SKETCH15_H)
    extrude(amount=BOSS_EXTRUDE8_DEPTH)

    # Fillet4
    fillet4_edges = [body_4.edges().sort_by_distance(p)[0] for p in [
        (6.618869032, 2.05, 0),
        (3.7384e-05, 2.05, -1.5),
        (-6.618794264, 2.05, 0),
        (3.7384e-05, 1.5, -1.5),
        (6.618869032, 1.5, 0),
        (3.7384e-05, 1.5, 1.5),
        (-6.618794264, 1.5, 0),
        (3.7384e-05, 2.05, 1.5),
    ]]
    fillet(fillet4_edges, radius=FILLET4_R)


with BuildPart() as body_5:
    # Sketch16 → Boss-Extrude9 (new, symmetric)
    with BuildSketch(Plane.XY):
        Polygon((13.281205736, 6.17), (5.931205736, 6.17), (-0.799012183, 3.611843094), (-3.999012183, 3.611843094), (-3.999012183, 3.111843094), (-0.799012183, 3.111843094), (5.931205736, 5.67), (13.031205736, 5.67), (13.031205736, 4), (13.531205736, 4), (13.531205736, 6.17), align=None)
    extrude(amount=BOSS_EXTRUDE9_DEPTH, both=True)

    # Fillet2
    fillet2_edges = [body_5.edges().sort_by_distance(p)[0] for p in [
        (5.931205736, 5.67, 0),
        (-0.799012183, 3.111843094, 0),
        (-0.799012183, 3.611843094, 0),
        (5.931205736, 6.17, 0),
        (13.531205736, 6.17, 0),
        (13.031205736, 5.67, 0),
    ]]
    fillet(fillet2_edges, radius=FILLET2_R)

    # Fillet3
    fillet3_edges = [body_5.edges().sort_by_distance(p)[0] for p in [
        (-2.444922393, 3.111843094, -1.625),
        (-3.999012183, 3.361843094, -1.625),
        (13.531205736, 4.835, -1.625),
        (13.531205736, 4.835, 1.625),
        (-3.999012183, 3.111843094, 0),
        (-3.999012183, 3.611843094, 0),
        (-3.999012183, 3.361843094, 1.625),
        (-2.444922393, 3.111843094, 1.625),
        (2.566096777, 4.390921547, -1.625),
        (2.566096777, 4.390921547, 1.625),
        (9.277115946, 5.67, -1.625),
        (-2.444922393, 3.611843094, -1.625),
        (2.566096777, 4.890921547, -1.625),
        (9.527115946, 6.17, -1.625),
        (13.031205736, 4.585, -1.625),
        (13.384759127, 6.023553391, -1.625),
        (5.932715919, 6.161776434, -1.625),
        (-0.800522366, 3.12006666, -1.625),
        (9.277115946, 5.67, 1.625),
        (13.031205736, 4.585, 1.625),
        (9.527115946, 6.17, 1.625),
        (2.566096777, 4.890921547, 1.625),
        (-2.444922393, 3.611843094, 1.625),
        (13.384759127, 6.023553391, 1.625),
        (5.932715919, 6.161776434, 1.625),
        (-0.800522366, 3.12006666, 1.625),
        (-0.800522366, 3.62006666, -1.625),
        (-0.800522366, 3.62006666, 1.625),
        (5.932715919, 5.661776434, -1.625),
        (5.932715919, 5.661776434, 1.625),
        (12.884759127, 5.523553391, -1.625),
        (12.884759127, 5.523553391, 1.625),
    ]]
    fillet(fillet3_edges, radius=FILLET3_R)

    # Sketch18 → Cut-Extrude4 (cut)
    with BuildSketch(Plane(origin=(-1.30042059, 3.421257678, 0), x_dir=(0.9347524888223904, 0.35529957027886616, 0), z_dir=(-0.3552995702788662, 0.9347524888223905, 0))):
        Polygon((4.086407672, 0.05), (3.311407672, 0.05), (3.311407672, -0.05), (4.086407672, -0.05), (4.086407672, -0.825), (4.186407672, -0.825), (4.186407672, -0.05), (4.961407672, -0.05), (4.961407672, 0.05), (4.186407672, 0.05), (4.186407672, 0.825), (4.086407672, 0.825), align=None)
    extrude(amount=-CUT_EXTRUDE4_DEPTH, mode=Mode.SUBTRACT)


solid = Compound([part.part, body_2.part, body_3.part, body_4.part, body_5.part])
